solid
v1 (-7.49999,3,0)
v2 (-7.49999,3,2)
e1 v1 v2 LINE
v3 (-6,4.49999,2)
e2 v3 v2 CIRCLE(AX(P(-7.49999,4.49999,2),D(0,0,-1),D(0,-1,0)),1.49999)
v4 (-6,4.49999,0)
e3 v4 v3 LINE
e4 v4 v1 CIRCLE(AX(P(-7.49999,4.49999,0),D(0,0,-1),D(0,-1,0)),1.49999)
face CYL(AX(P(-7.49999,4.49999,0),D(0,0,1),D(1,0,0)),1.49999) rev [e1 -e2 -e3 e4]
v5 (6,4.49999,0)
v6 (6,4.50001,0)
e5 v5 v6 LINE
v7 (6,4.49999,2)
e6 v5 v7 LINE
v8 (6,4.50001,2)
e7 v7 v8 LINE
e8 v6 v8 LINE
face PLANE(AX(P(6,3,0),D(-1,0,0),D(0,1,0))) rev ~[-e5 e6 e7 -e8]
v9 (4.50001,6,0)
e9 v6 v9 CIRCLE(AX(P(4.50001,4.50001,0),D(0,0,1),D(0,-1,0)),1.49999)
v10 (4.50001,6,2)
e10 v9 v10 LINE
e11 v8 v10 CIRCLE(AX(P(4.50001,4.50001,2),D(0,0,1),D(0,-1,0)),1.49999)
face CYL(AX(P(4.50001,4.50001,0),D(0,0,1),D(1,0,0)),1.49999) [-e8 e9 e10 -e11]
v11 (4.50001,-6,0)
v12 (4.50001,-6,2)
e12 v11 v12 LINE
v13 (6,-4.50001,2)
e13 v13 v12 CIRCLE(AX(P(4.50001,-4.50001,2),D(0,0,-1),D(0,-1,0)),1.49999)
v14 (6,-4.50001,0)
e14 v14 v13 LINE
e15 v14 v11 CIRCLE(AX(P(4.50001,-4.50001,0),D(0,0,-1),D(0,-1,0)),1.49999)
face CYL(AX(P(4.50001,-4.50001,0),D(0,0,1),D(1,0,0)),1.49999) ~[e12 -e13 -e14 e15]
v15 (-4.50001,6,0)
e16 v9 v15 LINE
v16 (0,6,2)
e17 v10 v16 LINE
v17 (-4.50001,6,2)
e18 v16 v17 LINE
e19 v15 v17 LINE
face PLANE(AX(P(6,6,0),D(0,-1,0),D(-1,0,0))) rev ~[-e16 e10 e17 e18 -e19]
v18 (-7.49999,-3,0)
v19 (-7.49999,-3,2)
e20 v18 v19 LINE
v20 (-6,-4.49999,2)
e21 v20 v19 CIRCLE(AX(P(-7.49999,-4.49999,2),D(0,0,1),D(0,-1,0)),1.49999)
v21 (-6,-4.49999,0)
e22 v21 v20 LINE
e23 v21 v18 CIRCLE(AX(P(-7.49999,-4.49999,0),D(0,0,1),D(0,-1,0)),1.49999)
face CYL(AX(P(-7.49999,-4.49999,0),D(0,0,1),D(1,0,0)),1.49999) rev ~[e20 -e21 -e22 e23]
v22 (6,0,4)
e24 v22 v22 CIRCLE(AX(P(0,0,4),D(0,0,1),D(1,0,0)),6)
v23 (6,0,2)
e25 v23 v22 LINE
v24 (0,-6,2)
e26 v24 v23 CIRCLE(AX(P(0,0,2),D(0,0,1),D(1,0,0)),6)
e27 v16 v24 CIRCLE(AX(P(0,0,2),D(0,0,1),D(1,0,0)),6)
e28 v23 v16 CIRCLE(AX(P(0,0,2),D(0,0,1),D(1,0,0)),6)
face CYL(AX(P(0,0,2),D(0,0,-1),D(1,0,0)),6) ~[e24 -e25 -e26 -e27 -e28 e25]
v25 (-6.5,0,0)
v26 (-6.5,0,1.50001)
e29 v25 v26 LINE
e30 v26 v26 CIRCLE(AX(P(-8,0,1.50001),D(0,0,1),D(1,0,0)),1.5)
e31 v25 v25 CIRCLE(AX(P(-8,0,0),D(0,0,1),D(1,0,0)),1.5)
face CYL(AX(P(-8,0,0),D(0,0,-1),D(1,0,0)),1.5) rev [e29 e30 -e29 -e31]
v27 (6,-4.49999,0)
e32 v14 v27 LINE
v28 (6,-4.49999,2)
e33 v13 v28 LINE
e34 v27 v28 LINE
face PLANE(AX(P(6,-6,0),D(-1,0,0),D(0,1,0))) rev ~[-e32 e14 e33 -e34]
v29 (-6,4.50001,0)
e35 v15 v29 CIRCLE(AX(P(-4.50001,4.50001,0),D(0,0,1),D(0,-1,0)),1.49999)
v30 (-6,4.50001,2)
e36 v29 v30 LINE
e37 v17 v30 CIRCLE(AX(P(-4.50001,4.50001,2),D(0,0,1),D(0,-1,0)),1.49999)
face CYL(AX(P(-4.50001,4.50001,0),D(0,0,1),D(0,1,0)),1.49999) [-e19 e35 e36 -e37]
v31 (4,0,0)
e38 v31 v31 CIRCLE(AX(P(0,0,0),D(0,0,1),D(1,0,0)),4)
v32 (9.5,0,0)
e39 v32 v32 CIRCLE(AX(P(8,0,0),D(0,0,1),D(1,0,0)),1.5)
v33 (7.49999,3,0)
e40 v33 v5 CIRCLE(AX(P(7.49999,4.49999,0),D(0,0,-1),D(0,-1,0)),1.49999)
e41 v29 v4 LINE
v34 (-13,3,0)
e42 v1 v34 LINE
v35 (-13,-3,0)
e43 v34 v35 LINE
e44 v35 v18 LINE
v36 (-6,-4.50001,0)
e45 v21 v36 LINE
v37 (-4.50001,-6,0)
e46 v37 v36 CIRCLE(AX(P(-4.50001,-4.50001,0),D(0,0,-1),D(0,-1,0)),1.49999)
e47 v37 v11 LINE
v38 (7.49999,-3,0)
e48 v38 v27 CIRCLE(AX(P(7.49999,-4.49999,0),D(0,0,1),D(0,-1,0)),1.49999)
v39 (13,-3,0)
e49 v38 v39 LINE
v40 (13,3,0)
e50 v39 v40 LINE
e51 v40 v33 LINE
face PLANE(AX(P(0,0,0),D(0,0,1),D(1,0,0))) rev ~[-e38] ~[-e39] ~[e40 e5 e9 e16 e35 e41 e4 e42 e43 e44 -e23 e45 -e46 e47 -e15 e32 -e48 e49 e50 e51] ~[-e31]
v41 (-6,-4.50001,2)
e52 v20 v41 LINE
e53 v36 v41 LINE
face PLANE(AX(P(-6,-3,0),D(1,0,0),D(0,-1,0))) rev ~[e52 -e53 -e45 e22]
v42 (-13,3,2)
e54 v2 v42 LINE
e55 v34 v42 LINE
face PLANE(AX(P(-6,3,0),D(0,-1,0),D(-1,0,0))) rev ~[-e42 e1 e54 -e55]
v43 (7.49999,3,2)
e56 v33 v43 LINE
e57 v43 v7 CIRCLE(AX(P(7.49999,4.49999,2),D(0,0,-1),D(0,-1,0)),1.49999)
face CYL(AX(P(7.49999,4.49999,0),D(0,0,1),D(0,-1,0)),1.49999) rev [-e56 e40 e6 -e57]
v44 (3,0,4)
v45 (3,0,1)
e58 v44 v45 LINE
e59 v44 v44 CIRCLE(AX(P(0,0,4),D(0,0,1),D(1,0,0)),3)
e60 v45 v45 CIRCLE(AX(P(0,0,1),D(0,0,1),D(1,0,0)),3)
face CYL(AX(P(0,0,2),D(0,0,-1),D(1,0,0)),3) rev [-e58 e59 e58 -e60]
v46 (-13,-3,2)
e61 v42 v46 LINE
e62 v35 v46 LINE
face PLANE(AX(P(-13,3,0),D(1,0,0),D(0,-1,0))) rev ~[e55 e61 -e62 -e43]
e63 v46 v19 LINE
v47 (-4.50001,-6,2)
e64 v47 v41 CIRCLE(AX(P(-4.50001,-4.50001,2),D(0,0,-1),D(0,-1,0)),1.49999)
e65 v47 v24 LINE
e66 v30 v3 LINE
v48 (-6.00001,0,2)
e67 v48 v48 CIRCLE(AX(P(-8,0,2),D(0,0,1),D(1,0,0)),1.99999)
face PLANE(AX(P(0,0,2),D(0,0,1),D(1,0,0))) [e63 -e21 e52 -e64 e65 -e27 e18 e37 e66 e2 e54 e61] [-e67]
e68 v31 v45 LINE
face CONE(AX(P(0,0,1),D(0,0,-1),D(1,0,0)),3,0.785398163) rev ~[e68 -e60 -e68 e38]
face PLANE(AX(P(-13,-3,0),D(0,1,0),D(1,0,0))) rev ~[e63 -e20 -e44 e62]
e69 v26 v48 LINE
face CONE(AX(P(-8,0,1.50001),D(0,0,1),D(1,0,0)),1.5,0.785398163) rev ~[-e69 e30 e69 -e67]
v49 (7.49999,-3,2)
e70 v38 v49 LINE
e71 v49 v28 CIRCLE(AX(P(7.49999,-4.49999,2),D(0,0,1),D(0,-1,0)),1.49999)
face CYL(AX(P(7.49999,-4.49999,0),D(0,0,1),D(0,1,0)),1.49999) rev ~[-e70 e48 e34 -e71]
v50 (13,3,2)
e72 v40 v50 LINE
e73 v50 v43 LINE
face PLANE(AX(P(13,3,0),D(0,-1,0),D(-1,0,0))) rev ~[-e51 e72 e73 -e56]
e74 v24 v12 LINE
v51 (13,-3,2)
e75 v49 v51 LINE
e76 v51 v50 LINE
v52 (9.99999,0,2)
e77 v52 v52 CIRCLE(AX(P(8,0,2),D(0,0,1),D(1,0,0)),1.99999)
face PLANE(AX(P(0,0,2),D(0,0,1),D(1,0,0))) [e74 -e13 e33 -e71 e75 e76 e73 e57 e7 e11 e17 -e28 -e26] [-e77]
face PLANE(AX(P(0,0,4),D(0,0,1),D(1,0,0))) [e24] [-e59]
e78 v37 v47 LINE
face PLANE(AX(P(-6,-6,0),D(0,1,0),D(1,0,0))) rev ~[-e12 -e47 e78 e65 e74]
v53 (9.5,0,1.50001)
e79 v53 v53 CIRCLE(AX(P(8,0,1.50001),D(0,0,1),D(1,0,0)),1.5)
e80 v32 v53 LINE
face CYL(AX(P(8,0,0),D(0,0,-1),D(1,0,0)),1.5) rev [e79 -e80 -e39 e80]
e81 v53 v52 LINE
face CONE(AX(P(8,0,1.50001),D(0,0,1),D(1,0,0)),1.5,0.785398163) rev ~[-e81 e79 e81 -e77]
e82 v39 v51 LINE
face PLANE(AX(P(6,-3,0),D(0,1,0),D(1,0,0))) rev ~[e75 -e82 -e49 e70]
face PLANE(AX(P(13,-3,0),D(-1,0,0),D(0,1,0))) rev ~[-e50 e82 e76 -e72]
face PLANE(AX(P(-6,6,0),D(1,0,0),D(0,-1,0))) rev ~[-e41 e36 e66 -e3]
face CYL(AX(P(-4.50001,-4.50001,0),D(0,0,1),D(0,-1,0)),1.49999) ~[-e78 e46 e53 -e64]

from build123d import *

# Parameters (mm, degrees)
F0_R     = 1.5
F0_R_2   = 3
F1_DEPTH = 2
F2_R     = 6
F2_R_2   = 3
F3_DEPTH = 2
F4_R     = 1.49999
F5_SIZE  = 1
F6_SIZE  = 0.49999


# Not quite as in the source:
# - a fillet or chamfer is up to 0.001 mm smaller than in the source, because OpenCascade refuses the exact size


with BuildPart() as f1:
    # F0 (on Top) → F1 (new body)
    with BuildSketch(Plane.XY):
        Polygon((-6, 3), (-13, 3), (-13, -3), (-6, -3), (-6, -6), (6, -6), (6, -3), (13, -3), (13, 3), (6, 3), (6, 6), (-6, 6), align=None)
        with Locations((-8, 0)):
            Circle(F0_R, mode=Mode.SUBTRACT)
        Circle(F0_R_2, mode=Mode.SUBTRACT)
        with Locations((8, 0)):
            Circle(F0_R, mode=Mode.SUBTRACT)
    extrude(amount=F1_DEPTH)

    # F2 (on face) → F3 (join)
    with BuildSketch(Plane.XY.offset(2)):
        Circle(F2_R)
        Circle(F2_R_2, mode=Mode.SUBTRACT)
    extrude(amount=F3_DEPTH)

    # F4 (radius 1.5 in the source; OpenCascade refuses exactly that, so slightly less here)
    f4_edges = [f1.edges().sort_by_distance(p)[0] for p in [
        (-6, -6, 1),
        (6, -6, 1),
        (6, 6, 1),
        (-6, 6, 1),
        (-6, 3, 1),
        (-6, -3, 1),
        (6, 3, 1),
        (6, -3, 1),
    ]]
    fillet(f4_edges, radius=F4_R)

    # F5
    f5_edges = [f1.edges().sort_by_distance(p)[0] for p in [
        (-3, 0, 0),
    ]]
    chamfer(f5_edges, length=F5_SIZE)

    # F6 (size 0.5 in the source; OpenCascade refuses exactly that, so slightly less here)
    f6_edges = [f1.edges().sort_by_distance(p)[0] for p in [
        (-9.5, 0, 2),
        (6.5, 0, 2),
    ]]
    chamfer(f6_edges, length=F6_SIZE)


solid = f1.part
